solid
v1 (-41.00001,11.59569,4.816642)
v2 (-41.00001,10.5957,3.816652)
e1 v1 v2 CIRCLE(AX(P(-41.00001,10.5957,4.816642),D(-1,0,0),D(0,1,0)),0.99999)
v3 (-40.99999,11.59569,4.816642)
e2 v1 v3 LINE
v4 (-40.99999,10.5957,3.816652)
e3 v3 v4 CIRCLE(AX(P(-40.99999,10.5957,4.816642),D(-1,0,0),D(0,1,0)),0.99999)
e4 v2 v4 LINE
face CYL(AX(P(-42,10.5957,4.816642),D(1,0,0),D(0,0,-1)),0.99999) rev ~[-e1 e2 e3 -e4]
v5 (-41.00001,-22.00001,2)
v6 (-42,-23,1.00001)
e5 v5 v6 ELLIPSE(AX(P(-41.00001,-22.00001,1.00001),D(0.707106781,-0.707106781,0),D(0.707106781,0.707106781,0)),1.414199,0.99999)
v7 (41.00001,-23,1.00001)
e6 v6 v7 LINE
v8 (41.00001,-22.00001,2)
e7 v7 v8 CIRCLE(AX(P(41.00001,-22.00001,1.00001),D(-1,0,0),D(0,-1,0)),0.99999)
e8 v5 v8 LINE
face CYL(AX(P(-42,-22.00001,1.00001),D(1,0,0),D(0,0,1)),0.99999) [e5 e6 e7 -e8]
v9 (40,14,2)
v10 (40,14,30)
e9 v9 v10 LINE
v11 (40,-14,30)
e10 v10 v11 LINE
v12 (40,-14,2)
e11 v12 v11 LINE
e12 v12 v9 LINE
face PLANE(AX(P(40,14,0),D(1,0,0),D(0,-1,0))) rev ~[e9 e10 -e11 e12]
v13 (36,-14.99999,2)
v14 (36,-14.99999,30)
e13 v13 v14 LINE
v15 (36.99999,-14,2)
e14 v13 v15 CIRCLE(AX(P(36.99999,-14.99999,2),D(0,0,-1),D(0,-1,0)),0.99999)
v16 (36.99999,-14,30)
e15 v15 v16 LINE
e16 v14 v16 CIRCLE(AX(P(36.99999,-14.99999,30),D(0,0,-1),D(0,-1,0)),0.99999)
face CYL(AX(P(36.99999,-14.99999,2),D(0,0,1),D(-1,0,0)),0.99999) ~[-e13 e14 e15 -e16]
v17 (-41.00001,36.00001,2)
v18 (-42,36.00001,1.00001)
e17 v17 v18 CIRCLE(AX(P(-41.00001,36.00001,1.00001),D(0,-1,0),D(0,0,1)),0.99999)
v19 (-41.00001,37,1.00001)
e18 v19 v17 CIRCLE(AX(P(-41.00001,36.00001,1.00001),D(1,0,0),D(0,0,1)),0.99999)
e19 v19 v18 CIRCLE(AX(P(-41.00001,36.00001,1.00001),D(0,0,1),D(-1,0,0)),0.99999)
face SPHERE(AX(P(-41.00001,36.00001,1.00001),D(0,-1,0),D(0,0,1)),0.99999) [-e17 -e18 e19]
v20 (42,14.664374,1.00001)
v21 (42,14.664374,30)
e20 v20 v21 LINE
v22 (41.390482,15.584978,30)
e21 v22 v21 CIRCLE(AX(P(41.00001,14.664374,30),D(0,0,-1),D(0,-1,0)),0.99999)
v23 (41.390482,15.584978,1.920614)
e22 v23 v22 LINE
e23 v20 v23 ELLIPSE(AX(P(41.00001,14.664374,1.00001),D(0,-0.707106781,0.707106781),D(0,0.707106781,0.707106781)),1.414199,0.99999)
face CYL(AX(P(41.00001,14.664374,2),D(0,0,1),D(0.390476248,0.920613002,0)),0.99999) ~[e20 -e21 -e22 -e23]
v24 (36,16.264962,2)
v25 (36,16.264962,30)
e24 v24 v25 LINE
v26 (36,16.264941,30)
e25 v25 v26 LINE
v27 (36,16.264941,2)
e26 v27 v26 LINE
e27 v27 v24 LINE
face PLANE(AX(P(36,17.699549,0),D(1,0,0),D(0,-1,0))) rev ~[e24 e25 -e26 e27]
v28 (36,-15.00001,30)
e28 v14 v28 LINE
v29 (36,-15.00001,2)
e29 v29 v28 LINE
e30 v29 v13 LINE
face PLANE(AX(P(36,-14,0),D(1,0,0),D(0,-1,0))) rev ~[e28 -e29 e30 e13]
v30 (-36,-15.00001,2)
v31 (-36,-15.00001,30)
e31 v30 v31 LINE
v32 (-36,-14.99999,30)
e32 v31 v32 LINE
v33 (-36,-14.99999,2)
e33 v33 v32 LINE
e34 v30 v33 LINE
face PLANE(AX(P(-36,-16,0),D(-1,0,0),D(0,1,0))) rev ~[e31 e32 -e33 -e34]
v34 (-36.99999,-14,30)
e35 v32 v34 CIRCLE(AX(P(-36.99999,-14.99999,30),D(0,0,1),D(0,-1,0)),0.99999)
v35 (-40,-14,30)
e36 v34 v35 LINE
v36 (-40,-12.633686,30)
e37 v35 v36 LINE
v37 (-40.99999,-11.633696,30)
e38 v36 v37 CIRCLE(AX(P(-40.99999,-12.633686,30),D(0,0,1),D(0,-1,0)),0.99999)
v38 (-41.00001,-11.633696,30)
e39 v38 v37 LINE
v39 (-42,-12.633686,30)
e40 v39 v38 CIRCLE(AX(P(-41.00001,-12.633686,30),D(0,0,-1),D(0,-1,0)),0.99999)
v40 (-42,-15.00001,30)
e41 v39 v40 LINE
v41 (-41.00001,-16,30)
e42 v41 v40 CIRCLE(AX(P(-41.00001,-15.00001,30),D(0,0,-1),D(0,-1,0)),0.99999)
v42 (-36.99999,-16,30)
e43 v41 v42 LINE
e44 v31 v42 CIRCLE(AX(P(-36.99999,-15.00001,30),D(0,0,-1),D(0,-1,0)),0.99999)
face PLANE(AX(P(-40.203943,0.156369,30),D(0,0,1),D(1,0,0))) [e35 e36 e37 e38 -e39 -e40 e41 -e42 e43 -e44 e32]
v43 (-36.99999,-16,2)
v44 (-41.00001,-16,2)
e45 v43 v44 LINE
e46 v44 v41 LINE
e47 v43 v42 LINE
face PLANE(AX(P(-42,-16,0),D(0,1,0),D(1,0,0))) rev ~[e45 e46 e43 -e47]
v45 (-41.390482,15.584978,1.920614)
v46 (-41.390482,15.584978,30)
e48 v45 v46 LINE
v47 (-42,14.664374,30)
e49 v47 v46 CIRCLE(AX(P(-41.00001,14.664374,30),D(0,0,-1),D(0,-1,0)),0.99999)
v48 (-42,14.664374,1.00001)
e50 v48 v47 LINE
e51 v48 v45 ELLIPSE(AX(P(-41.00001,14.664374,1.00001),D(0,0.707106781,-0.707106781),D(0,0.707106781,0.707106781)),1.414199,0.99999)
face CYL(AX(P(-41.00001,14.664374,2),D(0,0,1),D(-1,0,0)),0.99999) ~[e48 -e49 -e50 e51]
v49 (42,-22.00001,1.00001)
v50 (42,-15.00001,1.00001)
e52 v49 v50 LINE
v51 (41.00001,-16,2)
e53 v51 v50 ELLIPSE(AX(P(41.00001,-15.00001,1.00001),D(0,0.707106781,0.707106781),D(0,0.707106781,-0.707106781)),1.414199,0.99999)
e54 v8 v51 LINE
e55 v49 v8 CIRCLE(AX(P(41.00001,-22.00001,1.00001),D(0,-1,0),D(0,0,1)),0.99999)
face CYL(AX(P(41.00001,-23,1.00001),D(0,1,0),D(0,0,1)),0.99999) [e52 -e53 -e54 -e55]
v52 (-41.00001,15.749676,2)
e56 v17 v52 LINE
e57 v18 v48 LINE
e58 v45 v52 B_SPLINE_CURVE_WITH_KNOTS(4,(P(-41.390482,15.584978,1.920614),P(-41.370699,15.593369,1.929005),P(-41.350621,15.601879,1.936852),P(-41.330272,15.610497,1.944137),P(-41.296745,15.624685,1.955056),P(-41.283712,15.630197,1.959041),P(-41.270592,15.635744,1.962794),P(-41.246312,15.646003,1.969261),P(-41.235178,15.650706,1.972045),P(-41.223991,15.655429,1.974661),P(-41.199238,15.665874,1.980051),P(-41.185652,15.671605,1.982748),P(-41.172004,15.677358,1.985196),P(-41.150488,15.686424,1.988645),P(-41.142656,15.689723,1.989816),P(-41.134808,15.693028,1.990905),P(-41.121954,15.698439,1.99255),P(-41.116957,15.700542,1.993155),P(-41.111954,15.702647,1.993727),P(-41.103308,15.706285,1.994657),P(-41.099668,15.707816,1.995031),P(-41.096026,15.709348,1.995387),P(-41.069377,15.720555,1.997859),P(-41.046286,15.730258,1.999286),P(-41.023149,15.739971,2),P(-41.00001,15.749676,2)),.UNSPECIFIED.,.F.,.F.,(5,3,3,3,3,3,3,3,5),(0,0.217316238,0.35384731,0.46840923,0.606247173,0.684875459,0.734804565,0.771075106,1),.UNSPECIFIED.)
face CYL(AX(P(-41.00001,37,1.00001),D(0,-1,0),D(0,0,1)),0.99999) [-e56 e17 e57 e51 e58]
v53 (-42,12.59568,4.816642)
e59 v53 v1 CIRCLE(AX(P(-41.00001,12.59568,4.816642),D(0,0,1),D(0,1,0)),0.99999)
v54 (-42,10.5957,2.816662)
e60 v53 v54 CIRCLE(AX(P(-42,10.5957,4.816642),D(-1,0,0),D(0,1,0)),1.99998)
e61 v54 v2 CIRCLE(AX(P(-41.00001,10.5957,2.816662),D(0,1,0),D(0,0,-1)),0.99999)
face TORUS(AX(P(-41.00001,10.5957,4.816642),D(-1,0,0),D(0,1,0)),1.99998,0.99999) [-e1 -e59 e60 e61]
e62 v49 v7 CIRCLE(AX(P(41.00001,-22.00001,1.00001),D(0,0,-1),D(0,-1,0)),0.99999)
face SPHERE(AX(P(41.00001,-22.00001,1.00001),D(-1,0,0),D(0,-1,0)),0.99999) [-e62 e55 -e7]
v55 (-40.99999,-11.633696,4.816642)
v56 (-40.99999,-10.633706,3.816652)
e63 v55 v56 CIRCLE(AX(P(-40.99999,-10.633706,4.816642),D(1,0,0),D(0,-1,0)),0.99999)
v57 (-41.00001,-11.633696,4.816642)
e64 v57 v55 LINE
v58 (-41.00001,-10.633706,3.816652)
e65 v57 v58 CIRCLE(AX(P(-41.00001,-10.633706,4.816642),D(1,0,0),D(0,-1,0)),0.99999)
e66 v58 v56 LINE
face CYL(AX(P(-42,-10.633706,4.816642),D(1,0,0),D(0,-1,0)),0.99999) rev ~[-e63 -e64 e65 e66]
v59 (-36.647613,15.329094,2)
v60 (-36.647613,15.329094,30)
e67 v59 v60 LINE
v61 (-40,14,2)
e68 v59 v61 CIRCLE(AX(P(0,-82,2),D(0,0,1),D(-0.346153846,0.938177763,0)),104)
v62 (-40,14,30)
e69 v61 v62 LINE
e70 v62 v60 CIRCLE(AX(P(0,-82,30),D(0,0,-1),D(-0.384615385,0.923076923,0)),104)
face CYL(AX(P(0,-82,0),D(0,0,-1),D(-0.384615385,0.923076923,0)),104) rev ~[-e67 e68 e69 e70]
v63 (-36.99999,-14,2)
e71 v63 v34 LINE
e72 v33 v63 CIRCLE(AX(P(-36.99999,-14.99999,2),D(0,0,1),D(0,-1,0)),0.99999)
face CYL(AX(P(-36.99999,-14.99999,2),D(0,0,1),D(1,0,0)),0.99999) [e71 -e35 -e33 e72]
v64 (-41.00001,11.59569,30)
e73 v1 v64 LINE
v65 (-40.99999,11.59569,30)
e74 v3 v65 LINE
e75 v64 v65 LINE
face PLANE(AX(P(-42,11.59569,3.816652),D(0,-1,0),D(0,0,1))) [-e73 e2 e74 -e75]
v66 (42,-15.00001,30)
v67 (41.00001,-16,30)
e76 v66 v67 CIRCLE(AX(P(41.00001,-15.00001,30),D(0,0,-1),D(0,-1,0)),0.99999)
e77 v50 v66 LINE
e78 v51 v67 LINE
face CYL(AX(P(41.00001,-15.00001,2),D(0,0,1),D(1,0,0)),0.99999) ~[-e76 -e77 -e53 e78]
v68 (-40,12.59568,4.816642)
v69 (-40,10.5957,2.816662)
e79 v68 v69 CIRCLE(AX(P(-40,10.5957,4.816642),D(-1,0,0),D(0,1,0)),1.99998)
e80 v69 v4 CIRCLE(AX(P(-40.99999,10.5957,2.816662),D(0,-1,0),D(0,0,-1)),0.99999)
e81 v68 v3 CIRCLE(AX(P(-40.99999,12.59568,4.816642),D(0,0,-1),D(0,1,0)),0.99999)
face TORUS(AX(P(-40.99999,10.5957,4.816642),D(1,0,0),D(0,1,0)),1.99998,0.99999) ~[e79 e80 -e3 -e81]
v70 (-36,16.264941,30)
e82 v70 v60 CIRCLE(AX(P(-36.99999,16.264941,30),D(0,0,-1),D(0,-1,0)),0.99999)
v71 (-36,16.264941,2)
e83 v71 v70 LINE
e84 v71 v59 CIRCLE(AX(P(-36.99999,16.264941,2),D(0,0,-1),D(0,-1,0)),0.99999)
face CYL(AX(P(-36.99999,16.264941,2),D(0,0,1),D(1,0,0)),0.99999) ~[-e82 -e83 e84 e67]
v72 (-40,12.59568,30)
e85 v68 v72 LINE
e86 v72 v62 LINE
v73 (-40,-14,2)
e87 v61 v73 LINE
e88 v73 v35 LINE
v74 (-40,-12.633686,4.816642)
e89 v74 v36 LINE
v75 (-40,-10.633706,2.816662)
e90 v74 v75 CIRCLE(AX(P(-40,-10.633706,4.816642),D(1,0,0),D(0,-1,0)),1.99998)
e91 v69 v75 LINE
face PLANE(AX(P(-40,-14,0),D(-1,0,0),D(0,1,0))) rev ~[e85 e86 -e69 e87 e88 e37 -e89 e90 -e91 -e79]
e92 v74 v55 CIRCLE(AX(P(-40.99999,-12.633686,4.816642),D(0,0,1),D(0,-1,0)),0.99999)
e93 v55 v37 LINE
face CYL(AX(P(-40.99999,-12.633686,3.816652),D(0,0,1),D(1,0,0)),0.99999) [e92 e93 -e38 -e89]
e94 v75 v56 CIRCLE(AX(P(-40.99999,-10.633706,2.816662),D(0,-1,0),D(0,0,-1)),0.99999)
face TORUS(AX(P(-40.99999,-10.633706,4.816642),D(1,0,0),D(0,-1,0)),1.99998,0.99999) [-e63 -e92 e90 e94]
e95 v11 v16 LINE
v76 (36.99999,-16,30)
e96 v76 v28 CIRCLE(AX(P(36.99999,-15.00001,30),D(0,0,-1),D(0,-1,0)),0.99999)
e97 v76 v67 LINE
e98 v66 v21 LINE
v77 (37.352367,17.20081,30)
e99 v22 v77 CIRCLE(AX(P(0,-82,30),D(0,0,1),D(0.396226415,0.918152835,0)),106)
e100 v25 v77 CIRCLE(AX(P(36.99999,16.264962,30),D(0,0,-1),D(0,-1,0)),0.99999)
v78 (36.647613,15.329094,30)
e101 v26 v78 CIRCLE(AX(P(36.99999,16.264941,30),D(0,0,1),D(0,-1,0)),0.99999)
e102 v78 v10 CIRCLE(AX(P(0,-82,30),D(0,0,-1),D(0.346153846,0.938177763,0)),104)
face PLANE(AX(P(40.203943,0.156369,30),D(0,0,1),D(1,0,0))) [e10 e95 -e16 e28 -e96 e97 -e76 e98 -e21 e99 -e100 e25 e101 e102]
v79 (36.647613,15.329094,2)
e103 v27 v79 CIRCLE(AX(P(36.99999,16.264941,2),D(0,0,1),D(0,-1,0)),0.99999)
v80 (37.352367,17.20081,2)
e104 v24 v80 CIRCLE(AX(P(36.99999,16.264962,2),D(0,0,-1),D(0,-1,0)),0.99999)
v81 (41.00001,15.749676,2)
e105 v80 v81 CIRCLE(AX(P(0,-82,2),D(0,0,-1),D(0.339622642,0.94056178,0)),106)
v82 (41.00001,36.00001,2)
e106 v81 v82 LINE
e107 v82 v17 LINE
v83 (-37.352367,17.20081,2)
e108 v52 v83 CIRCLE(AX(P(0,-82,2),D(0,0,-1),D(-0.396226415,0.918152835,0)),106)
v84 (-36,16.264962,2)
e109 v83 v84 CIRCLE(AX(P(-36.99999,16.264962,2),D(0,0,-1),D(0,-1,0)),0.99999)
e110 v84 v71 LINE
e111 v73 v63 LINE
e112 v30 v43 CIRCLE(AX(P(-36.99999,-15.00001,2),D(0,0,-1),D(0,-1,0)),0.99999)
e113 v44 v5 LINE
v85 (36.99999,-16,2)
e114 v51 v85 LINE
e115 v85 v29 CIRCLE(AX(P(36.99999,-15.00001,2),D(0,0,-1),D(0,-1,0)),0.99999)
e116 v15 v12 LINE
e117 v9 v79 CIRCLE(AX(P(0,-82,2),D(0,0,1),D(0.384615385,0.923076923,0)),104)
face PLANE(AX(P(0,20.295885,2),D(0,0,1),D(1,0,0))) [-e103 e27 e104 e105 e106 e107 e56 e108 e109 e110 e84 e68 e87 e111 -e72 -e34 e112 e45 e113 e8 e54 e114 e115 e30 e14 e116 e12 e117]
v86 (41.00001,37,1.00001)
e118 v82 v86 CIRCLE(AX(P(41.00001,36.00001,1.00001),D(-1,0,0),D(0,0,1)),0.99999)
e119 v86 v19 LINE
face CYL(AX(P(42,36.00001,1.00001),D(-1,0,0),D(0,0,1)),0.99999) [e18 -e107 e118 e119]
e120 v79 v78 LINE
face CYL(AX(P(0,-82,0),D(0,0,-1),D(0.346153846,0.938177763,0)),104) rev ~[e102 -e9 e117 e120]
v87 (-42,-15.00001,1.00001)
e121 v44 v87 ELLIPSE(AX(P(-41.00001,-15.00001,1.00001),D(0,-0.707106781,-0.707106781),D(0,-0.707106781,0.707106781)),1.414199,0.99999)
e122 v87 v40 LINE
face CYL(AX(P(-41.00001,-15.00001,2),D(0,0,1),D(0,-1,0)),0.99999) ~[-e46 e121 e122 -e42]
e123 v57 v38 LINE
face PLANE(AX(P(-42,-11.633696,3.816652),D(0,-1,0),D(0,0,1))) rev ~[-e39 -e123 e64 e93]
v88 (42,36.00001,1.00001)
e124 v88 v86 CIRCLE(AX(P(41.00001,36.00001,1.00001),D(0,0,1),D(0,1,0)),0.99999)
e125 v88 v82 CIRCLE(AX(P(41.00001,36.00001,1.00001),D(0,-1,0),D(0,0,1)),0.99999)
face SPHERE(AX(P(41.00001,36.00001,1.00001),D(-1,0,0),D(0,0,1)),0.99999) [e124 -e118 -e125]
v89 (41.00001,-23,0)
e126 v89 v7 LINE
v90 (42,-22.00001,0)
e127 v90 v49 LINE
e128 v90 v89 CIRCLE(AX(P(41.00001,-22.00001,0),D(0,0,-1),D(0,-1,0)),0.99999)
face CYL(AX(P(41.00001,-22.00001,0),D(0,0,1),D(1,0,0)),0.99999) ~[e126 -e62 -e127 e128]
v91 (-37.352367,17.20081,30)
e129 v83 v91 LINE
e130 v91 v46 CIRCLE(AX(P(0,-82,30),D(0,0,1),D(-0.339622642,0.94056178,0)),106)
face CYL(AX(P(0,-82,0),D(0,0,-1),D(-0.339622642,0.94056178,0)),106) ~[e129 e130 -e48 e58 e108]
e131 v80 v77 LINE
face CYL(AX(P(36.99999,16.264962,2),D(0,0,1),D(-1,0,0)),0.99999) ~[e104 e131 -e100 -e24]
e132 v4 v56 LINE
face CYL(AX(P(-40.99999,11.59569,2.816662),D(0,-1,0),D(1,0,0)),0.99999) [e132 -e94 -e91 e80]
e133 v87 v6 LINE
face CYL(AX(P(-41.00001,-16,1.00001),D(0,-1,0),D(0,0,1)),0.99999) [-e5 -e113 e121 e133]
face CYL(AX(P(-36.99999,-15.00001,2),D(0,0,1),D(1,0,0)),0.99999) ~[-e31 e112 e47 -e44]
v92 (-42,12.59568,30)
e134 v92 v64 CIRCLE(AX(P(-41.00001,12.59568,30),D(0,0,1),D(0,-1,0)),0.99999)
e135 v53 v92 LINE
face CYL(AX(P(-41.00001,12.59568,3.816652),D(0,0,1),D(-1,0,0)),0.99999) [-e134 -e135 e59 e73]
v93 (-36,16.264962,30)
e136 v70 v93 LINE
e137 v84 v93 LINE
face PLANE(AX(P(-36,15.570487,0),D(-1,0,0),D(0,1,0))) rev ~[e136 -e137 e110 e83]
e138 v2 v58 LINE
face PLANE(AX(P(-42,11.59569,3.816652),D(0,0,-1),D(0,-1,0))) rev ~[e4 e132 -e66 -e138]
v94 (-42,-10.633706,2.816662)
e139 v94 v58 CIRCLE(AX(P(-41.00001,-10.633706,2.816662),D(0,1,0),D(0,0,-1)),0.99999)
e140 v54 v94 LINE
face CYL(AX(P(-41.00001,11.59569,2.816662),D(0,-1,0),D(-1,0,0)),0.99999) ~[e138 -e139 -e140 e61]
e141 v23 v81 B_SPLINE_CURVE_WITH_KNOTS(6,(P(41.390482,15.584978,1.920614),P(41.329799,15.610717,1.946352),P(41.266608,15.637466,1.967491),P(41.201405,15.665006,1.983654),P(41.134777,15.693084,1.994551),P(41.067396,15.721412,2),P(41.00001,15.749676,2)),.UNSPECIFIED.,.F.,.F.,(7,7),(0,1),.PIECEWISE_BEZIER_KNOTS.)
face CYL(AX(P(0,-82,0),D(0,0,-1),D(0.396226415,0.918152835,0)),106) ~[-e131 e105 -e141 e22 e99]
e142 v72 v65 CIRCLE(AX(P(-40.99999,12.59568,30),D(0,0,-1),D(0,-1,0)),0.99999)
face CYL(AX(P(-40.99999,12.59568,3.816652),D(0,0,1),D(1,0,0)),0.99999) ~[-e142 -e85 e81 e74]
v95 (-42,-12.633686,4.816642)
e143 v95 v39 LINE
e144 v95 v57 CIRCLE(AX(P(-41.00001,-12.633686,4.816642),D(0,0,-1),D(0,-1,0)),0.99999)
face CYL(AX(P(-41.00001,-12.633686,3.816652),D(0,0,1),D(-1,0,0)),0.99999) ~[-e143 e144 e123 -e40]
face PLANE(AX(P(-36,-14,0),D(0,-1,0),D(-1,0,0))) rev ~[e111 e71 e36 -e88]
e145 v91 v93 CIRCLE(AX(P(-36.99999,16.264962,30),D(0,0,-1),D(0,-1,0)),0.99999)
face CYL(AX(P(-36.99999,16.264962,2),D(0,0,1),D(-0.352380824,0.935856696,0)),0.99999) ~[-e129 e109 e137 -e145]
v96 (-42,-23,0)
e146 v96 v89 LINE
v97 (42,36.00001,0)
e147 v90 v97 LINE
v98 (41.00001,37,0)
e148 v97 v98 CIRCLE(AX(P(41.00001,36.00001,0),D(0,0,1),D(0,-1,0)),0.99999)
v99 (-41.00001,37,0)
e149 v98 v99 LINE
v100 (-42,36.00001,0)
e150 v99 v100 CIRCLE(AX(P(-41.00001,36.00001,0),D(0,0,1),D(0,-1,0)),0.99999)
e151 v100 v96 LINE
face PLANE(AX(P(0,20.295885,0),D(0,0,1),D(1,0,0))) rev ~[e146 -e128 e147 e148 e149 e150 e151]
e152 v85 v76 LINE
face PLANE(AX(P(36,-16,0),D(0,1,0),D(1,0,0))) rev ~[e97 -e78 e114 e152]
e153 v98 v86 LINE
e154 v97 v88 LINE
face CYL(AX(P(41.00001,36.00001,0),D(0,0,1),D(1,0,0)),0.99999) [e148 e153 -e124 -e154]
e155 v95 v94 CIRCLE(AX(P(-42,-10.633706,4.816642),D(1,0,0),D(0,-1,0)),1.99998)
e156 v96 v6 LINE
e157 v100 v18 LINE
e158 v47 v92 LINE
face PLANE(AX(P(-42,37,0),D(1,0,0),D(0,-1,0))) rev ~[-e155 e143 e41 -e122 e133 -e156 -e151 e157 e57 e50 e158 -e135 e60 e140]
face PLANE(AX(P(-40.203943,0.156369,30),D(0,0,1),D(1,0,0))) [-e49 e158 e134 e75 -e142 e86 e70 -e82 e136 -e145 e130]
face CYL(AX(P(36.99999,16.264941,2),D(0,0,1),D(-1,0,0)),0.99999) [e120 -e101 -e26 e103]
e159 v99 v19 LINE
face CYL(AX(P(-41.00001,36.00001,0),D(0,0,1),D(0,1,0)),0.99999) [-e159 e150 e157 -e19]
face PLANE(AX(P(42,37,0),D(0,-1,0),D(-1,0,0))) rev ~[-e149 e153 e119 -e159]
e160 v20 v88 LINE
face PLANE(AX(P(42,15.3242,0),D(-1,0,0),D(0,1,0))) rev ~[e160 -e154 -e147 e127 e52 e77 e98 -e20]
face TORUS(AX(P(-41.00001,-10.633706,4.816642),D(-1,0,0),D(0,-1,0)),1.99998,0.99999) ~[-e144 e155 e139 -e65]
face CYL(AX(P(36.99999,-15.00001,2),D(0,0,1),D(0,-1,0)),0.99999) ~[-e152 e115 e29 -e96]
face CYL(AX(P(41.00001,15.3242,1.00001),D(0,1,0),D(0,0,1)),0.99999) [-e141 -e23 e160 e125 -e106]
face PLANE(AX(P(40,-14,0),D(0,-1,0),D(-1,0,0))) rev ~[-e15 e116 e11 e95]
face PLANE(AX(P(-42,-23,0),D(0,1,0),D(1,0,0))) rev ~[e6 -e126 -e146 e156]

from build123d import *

# Parameters (mm, degrees)
F0_W     = 72
F0_H     = 2
F1_DEPTH = 2
F2_DEPTH = 30
F3_W     = 23.2293857262
F3_H     = 26.1833476555
F4_DEPTH = 2
F5_R     = 0.99999


# Not quite as in the source:
# - a fillet or chamfer is up to 0.001 mm smaller than in the source, because OpenCascade refuses the exact size


with BuildPart() as f1:
    # F0 (on Top) → F1 (new body)
    with BuildSketch(Plane.XY):
        with BuildLine():
            ThreePointArc((-36, 15.5704873412), (0, 22), (36, 15.5704873412))
            Line((36, 15.5704873412), (36, 17.6995486449))
            ThreePointArc((36, 17.6995486449), (0, 24), (-36, 17.6995486449))
            Line((-36, 17.6995486449), (-36, 15.5704873412))
        make_face()
        with BuildLine():
            Line((-40, 14), (40, 14))
            ThreePointArc((40, 14), (38.0081123923, 14.8059057722), (36, 15.5704873412))
            ThreePointArc((36, 15.5704873412), (0, 22), (-36, 15.5704873412))
            ThreePointArc((-36, 15.5704873412), (-38.0081123923, 14.8059057722), (-40, 14))
        make_face()
        Polygon((36, -14), (40, -14), (40, 14), (-40, 14), (-40, -14), (-36, -14), align=None)
        with Locations((0, -15)):
            Rectangle(F0_W, F0_H)
        with BuildLine():
            ThreePointArc((-36, 17.6995486449), (0, 24), (36, 17.6995486449))
            ThreePointArc((36, 17.6995486449), (39.0180800363, 16.5575437512), (42, 15.3242004848))
            Line((42, 15.3242004848), (42, 37))
            Line((42, 37), (-42, 37))
            Line((-42, 37), (-42, 15.3242004848))
            ThreePointArc((-42, 15.3242004848), (-39.0180800363, 16.5575437512), (-36, 17.6995486449))
        make_face()
        Polygon((42, -16), (36, -16), (-36, -16), (-42, -16), (-42, -23), (42, -23), align=None)
    extrude(amount=F1_DEPTH)

    # F0 (on Top) → F2 (join)
    with BuildSketch(Plane.XY):
        with BuildLine():
            Line((-36, -16), (-36, -14))
            Line((-36, -14), (-40, -14))
            Line((-40, -14), (-40, 14))
            ThreePointArc((-40, 14), (-38.0081123923, 14.8059057722), (-36, 15.5704873412))
            Line((-36, 15.5704873412), (-36, 17.6995486449))
            ThreePointArc((-36, 17.6995486449), (-39.0180800363, 16.5575437512), (-42, 15.3242004848))
            Line((-42, 15.3242004848), (-42, -16))
            Line((-42, -16), (-36, -16))
        make_face()
        with BuildLine():
            Line((40, 14), (40, -14))
            Line((40, -14), (36, -14))
            Line((36, -14), (36, -16))
            Line((36, -16), (42, -16))
            Line((42, -16), (42, 15.3242004848))
            ThreePointArc((42, 15.3242004848), (39.0180800363, 16.5575437512), (36, 17.6995486449))
            Line((36, 17.6995486449), (36, 15.5704873412))
            ThreePointArc((36, 15.5704873412), (38.0081123923, 14.8059057722), (40, 14))
        make_face()
    extrude(amount=F2_DEPTH)

    # F3 (on face) → F4 (cut, through all)
    with BuildSketch(Plane(origin=(-42, 0, 0), x_dir=(0, -1, 0), z_dir=(-1, 0, 0))):
        with Locations((0.0190031715, 16.9083261723)):
            Rectangle(F3_W, F3_H)
    extrude(amount=-F4_DEPTH, mode=Mode.SUBTRACT)

    # F5 (radius 1 in the source; OpenCascade refuses exactly that, so slightly less here)
    f5_edges = [f1.edges().sort_by_distance(p)[0] for p in [
        (0, -23, 2),
        (42, -23, 1),
        (42, -19.5, 2),
        (-42, -19.5, 2),
        (-42, 26.1621, 2),
        (0, 37, 2),
        (-42, 37, 1),
        (42, 26.1621, 2),
        (42, 37, 1),
        (42, 15.3242, 16),
        (42, -16, 16),
        (36, 17.699549, 16),
        (36, 15.570487, 16),
        (36, -16, 16),
        (36, -14, 16),
        (-42, 15.3242, 16),
        (-36, 17.699549, 16),
        (-42, 11.59569, 16.908326),
        (-42, -11.633696, 16.908326),
        (-42, -16, 16),
        (-36, -16, 16),
        (-36, -14, 16),
        (-36, 15.570487, 16),
        (-40, -11.633696, 16.908326),
        (-40, 11.59569, 16.908326),
        (-42, -0.019003, 3.816652),
        (-40, -0.019003, 3.816652),
        (-41, -11.633696, 3.816652),
        (-41, 11.59569, 3.816652),
    ]]
    fillet(f5_edges, radius=F5_R)


solid = f1.part
